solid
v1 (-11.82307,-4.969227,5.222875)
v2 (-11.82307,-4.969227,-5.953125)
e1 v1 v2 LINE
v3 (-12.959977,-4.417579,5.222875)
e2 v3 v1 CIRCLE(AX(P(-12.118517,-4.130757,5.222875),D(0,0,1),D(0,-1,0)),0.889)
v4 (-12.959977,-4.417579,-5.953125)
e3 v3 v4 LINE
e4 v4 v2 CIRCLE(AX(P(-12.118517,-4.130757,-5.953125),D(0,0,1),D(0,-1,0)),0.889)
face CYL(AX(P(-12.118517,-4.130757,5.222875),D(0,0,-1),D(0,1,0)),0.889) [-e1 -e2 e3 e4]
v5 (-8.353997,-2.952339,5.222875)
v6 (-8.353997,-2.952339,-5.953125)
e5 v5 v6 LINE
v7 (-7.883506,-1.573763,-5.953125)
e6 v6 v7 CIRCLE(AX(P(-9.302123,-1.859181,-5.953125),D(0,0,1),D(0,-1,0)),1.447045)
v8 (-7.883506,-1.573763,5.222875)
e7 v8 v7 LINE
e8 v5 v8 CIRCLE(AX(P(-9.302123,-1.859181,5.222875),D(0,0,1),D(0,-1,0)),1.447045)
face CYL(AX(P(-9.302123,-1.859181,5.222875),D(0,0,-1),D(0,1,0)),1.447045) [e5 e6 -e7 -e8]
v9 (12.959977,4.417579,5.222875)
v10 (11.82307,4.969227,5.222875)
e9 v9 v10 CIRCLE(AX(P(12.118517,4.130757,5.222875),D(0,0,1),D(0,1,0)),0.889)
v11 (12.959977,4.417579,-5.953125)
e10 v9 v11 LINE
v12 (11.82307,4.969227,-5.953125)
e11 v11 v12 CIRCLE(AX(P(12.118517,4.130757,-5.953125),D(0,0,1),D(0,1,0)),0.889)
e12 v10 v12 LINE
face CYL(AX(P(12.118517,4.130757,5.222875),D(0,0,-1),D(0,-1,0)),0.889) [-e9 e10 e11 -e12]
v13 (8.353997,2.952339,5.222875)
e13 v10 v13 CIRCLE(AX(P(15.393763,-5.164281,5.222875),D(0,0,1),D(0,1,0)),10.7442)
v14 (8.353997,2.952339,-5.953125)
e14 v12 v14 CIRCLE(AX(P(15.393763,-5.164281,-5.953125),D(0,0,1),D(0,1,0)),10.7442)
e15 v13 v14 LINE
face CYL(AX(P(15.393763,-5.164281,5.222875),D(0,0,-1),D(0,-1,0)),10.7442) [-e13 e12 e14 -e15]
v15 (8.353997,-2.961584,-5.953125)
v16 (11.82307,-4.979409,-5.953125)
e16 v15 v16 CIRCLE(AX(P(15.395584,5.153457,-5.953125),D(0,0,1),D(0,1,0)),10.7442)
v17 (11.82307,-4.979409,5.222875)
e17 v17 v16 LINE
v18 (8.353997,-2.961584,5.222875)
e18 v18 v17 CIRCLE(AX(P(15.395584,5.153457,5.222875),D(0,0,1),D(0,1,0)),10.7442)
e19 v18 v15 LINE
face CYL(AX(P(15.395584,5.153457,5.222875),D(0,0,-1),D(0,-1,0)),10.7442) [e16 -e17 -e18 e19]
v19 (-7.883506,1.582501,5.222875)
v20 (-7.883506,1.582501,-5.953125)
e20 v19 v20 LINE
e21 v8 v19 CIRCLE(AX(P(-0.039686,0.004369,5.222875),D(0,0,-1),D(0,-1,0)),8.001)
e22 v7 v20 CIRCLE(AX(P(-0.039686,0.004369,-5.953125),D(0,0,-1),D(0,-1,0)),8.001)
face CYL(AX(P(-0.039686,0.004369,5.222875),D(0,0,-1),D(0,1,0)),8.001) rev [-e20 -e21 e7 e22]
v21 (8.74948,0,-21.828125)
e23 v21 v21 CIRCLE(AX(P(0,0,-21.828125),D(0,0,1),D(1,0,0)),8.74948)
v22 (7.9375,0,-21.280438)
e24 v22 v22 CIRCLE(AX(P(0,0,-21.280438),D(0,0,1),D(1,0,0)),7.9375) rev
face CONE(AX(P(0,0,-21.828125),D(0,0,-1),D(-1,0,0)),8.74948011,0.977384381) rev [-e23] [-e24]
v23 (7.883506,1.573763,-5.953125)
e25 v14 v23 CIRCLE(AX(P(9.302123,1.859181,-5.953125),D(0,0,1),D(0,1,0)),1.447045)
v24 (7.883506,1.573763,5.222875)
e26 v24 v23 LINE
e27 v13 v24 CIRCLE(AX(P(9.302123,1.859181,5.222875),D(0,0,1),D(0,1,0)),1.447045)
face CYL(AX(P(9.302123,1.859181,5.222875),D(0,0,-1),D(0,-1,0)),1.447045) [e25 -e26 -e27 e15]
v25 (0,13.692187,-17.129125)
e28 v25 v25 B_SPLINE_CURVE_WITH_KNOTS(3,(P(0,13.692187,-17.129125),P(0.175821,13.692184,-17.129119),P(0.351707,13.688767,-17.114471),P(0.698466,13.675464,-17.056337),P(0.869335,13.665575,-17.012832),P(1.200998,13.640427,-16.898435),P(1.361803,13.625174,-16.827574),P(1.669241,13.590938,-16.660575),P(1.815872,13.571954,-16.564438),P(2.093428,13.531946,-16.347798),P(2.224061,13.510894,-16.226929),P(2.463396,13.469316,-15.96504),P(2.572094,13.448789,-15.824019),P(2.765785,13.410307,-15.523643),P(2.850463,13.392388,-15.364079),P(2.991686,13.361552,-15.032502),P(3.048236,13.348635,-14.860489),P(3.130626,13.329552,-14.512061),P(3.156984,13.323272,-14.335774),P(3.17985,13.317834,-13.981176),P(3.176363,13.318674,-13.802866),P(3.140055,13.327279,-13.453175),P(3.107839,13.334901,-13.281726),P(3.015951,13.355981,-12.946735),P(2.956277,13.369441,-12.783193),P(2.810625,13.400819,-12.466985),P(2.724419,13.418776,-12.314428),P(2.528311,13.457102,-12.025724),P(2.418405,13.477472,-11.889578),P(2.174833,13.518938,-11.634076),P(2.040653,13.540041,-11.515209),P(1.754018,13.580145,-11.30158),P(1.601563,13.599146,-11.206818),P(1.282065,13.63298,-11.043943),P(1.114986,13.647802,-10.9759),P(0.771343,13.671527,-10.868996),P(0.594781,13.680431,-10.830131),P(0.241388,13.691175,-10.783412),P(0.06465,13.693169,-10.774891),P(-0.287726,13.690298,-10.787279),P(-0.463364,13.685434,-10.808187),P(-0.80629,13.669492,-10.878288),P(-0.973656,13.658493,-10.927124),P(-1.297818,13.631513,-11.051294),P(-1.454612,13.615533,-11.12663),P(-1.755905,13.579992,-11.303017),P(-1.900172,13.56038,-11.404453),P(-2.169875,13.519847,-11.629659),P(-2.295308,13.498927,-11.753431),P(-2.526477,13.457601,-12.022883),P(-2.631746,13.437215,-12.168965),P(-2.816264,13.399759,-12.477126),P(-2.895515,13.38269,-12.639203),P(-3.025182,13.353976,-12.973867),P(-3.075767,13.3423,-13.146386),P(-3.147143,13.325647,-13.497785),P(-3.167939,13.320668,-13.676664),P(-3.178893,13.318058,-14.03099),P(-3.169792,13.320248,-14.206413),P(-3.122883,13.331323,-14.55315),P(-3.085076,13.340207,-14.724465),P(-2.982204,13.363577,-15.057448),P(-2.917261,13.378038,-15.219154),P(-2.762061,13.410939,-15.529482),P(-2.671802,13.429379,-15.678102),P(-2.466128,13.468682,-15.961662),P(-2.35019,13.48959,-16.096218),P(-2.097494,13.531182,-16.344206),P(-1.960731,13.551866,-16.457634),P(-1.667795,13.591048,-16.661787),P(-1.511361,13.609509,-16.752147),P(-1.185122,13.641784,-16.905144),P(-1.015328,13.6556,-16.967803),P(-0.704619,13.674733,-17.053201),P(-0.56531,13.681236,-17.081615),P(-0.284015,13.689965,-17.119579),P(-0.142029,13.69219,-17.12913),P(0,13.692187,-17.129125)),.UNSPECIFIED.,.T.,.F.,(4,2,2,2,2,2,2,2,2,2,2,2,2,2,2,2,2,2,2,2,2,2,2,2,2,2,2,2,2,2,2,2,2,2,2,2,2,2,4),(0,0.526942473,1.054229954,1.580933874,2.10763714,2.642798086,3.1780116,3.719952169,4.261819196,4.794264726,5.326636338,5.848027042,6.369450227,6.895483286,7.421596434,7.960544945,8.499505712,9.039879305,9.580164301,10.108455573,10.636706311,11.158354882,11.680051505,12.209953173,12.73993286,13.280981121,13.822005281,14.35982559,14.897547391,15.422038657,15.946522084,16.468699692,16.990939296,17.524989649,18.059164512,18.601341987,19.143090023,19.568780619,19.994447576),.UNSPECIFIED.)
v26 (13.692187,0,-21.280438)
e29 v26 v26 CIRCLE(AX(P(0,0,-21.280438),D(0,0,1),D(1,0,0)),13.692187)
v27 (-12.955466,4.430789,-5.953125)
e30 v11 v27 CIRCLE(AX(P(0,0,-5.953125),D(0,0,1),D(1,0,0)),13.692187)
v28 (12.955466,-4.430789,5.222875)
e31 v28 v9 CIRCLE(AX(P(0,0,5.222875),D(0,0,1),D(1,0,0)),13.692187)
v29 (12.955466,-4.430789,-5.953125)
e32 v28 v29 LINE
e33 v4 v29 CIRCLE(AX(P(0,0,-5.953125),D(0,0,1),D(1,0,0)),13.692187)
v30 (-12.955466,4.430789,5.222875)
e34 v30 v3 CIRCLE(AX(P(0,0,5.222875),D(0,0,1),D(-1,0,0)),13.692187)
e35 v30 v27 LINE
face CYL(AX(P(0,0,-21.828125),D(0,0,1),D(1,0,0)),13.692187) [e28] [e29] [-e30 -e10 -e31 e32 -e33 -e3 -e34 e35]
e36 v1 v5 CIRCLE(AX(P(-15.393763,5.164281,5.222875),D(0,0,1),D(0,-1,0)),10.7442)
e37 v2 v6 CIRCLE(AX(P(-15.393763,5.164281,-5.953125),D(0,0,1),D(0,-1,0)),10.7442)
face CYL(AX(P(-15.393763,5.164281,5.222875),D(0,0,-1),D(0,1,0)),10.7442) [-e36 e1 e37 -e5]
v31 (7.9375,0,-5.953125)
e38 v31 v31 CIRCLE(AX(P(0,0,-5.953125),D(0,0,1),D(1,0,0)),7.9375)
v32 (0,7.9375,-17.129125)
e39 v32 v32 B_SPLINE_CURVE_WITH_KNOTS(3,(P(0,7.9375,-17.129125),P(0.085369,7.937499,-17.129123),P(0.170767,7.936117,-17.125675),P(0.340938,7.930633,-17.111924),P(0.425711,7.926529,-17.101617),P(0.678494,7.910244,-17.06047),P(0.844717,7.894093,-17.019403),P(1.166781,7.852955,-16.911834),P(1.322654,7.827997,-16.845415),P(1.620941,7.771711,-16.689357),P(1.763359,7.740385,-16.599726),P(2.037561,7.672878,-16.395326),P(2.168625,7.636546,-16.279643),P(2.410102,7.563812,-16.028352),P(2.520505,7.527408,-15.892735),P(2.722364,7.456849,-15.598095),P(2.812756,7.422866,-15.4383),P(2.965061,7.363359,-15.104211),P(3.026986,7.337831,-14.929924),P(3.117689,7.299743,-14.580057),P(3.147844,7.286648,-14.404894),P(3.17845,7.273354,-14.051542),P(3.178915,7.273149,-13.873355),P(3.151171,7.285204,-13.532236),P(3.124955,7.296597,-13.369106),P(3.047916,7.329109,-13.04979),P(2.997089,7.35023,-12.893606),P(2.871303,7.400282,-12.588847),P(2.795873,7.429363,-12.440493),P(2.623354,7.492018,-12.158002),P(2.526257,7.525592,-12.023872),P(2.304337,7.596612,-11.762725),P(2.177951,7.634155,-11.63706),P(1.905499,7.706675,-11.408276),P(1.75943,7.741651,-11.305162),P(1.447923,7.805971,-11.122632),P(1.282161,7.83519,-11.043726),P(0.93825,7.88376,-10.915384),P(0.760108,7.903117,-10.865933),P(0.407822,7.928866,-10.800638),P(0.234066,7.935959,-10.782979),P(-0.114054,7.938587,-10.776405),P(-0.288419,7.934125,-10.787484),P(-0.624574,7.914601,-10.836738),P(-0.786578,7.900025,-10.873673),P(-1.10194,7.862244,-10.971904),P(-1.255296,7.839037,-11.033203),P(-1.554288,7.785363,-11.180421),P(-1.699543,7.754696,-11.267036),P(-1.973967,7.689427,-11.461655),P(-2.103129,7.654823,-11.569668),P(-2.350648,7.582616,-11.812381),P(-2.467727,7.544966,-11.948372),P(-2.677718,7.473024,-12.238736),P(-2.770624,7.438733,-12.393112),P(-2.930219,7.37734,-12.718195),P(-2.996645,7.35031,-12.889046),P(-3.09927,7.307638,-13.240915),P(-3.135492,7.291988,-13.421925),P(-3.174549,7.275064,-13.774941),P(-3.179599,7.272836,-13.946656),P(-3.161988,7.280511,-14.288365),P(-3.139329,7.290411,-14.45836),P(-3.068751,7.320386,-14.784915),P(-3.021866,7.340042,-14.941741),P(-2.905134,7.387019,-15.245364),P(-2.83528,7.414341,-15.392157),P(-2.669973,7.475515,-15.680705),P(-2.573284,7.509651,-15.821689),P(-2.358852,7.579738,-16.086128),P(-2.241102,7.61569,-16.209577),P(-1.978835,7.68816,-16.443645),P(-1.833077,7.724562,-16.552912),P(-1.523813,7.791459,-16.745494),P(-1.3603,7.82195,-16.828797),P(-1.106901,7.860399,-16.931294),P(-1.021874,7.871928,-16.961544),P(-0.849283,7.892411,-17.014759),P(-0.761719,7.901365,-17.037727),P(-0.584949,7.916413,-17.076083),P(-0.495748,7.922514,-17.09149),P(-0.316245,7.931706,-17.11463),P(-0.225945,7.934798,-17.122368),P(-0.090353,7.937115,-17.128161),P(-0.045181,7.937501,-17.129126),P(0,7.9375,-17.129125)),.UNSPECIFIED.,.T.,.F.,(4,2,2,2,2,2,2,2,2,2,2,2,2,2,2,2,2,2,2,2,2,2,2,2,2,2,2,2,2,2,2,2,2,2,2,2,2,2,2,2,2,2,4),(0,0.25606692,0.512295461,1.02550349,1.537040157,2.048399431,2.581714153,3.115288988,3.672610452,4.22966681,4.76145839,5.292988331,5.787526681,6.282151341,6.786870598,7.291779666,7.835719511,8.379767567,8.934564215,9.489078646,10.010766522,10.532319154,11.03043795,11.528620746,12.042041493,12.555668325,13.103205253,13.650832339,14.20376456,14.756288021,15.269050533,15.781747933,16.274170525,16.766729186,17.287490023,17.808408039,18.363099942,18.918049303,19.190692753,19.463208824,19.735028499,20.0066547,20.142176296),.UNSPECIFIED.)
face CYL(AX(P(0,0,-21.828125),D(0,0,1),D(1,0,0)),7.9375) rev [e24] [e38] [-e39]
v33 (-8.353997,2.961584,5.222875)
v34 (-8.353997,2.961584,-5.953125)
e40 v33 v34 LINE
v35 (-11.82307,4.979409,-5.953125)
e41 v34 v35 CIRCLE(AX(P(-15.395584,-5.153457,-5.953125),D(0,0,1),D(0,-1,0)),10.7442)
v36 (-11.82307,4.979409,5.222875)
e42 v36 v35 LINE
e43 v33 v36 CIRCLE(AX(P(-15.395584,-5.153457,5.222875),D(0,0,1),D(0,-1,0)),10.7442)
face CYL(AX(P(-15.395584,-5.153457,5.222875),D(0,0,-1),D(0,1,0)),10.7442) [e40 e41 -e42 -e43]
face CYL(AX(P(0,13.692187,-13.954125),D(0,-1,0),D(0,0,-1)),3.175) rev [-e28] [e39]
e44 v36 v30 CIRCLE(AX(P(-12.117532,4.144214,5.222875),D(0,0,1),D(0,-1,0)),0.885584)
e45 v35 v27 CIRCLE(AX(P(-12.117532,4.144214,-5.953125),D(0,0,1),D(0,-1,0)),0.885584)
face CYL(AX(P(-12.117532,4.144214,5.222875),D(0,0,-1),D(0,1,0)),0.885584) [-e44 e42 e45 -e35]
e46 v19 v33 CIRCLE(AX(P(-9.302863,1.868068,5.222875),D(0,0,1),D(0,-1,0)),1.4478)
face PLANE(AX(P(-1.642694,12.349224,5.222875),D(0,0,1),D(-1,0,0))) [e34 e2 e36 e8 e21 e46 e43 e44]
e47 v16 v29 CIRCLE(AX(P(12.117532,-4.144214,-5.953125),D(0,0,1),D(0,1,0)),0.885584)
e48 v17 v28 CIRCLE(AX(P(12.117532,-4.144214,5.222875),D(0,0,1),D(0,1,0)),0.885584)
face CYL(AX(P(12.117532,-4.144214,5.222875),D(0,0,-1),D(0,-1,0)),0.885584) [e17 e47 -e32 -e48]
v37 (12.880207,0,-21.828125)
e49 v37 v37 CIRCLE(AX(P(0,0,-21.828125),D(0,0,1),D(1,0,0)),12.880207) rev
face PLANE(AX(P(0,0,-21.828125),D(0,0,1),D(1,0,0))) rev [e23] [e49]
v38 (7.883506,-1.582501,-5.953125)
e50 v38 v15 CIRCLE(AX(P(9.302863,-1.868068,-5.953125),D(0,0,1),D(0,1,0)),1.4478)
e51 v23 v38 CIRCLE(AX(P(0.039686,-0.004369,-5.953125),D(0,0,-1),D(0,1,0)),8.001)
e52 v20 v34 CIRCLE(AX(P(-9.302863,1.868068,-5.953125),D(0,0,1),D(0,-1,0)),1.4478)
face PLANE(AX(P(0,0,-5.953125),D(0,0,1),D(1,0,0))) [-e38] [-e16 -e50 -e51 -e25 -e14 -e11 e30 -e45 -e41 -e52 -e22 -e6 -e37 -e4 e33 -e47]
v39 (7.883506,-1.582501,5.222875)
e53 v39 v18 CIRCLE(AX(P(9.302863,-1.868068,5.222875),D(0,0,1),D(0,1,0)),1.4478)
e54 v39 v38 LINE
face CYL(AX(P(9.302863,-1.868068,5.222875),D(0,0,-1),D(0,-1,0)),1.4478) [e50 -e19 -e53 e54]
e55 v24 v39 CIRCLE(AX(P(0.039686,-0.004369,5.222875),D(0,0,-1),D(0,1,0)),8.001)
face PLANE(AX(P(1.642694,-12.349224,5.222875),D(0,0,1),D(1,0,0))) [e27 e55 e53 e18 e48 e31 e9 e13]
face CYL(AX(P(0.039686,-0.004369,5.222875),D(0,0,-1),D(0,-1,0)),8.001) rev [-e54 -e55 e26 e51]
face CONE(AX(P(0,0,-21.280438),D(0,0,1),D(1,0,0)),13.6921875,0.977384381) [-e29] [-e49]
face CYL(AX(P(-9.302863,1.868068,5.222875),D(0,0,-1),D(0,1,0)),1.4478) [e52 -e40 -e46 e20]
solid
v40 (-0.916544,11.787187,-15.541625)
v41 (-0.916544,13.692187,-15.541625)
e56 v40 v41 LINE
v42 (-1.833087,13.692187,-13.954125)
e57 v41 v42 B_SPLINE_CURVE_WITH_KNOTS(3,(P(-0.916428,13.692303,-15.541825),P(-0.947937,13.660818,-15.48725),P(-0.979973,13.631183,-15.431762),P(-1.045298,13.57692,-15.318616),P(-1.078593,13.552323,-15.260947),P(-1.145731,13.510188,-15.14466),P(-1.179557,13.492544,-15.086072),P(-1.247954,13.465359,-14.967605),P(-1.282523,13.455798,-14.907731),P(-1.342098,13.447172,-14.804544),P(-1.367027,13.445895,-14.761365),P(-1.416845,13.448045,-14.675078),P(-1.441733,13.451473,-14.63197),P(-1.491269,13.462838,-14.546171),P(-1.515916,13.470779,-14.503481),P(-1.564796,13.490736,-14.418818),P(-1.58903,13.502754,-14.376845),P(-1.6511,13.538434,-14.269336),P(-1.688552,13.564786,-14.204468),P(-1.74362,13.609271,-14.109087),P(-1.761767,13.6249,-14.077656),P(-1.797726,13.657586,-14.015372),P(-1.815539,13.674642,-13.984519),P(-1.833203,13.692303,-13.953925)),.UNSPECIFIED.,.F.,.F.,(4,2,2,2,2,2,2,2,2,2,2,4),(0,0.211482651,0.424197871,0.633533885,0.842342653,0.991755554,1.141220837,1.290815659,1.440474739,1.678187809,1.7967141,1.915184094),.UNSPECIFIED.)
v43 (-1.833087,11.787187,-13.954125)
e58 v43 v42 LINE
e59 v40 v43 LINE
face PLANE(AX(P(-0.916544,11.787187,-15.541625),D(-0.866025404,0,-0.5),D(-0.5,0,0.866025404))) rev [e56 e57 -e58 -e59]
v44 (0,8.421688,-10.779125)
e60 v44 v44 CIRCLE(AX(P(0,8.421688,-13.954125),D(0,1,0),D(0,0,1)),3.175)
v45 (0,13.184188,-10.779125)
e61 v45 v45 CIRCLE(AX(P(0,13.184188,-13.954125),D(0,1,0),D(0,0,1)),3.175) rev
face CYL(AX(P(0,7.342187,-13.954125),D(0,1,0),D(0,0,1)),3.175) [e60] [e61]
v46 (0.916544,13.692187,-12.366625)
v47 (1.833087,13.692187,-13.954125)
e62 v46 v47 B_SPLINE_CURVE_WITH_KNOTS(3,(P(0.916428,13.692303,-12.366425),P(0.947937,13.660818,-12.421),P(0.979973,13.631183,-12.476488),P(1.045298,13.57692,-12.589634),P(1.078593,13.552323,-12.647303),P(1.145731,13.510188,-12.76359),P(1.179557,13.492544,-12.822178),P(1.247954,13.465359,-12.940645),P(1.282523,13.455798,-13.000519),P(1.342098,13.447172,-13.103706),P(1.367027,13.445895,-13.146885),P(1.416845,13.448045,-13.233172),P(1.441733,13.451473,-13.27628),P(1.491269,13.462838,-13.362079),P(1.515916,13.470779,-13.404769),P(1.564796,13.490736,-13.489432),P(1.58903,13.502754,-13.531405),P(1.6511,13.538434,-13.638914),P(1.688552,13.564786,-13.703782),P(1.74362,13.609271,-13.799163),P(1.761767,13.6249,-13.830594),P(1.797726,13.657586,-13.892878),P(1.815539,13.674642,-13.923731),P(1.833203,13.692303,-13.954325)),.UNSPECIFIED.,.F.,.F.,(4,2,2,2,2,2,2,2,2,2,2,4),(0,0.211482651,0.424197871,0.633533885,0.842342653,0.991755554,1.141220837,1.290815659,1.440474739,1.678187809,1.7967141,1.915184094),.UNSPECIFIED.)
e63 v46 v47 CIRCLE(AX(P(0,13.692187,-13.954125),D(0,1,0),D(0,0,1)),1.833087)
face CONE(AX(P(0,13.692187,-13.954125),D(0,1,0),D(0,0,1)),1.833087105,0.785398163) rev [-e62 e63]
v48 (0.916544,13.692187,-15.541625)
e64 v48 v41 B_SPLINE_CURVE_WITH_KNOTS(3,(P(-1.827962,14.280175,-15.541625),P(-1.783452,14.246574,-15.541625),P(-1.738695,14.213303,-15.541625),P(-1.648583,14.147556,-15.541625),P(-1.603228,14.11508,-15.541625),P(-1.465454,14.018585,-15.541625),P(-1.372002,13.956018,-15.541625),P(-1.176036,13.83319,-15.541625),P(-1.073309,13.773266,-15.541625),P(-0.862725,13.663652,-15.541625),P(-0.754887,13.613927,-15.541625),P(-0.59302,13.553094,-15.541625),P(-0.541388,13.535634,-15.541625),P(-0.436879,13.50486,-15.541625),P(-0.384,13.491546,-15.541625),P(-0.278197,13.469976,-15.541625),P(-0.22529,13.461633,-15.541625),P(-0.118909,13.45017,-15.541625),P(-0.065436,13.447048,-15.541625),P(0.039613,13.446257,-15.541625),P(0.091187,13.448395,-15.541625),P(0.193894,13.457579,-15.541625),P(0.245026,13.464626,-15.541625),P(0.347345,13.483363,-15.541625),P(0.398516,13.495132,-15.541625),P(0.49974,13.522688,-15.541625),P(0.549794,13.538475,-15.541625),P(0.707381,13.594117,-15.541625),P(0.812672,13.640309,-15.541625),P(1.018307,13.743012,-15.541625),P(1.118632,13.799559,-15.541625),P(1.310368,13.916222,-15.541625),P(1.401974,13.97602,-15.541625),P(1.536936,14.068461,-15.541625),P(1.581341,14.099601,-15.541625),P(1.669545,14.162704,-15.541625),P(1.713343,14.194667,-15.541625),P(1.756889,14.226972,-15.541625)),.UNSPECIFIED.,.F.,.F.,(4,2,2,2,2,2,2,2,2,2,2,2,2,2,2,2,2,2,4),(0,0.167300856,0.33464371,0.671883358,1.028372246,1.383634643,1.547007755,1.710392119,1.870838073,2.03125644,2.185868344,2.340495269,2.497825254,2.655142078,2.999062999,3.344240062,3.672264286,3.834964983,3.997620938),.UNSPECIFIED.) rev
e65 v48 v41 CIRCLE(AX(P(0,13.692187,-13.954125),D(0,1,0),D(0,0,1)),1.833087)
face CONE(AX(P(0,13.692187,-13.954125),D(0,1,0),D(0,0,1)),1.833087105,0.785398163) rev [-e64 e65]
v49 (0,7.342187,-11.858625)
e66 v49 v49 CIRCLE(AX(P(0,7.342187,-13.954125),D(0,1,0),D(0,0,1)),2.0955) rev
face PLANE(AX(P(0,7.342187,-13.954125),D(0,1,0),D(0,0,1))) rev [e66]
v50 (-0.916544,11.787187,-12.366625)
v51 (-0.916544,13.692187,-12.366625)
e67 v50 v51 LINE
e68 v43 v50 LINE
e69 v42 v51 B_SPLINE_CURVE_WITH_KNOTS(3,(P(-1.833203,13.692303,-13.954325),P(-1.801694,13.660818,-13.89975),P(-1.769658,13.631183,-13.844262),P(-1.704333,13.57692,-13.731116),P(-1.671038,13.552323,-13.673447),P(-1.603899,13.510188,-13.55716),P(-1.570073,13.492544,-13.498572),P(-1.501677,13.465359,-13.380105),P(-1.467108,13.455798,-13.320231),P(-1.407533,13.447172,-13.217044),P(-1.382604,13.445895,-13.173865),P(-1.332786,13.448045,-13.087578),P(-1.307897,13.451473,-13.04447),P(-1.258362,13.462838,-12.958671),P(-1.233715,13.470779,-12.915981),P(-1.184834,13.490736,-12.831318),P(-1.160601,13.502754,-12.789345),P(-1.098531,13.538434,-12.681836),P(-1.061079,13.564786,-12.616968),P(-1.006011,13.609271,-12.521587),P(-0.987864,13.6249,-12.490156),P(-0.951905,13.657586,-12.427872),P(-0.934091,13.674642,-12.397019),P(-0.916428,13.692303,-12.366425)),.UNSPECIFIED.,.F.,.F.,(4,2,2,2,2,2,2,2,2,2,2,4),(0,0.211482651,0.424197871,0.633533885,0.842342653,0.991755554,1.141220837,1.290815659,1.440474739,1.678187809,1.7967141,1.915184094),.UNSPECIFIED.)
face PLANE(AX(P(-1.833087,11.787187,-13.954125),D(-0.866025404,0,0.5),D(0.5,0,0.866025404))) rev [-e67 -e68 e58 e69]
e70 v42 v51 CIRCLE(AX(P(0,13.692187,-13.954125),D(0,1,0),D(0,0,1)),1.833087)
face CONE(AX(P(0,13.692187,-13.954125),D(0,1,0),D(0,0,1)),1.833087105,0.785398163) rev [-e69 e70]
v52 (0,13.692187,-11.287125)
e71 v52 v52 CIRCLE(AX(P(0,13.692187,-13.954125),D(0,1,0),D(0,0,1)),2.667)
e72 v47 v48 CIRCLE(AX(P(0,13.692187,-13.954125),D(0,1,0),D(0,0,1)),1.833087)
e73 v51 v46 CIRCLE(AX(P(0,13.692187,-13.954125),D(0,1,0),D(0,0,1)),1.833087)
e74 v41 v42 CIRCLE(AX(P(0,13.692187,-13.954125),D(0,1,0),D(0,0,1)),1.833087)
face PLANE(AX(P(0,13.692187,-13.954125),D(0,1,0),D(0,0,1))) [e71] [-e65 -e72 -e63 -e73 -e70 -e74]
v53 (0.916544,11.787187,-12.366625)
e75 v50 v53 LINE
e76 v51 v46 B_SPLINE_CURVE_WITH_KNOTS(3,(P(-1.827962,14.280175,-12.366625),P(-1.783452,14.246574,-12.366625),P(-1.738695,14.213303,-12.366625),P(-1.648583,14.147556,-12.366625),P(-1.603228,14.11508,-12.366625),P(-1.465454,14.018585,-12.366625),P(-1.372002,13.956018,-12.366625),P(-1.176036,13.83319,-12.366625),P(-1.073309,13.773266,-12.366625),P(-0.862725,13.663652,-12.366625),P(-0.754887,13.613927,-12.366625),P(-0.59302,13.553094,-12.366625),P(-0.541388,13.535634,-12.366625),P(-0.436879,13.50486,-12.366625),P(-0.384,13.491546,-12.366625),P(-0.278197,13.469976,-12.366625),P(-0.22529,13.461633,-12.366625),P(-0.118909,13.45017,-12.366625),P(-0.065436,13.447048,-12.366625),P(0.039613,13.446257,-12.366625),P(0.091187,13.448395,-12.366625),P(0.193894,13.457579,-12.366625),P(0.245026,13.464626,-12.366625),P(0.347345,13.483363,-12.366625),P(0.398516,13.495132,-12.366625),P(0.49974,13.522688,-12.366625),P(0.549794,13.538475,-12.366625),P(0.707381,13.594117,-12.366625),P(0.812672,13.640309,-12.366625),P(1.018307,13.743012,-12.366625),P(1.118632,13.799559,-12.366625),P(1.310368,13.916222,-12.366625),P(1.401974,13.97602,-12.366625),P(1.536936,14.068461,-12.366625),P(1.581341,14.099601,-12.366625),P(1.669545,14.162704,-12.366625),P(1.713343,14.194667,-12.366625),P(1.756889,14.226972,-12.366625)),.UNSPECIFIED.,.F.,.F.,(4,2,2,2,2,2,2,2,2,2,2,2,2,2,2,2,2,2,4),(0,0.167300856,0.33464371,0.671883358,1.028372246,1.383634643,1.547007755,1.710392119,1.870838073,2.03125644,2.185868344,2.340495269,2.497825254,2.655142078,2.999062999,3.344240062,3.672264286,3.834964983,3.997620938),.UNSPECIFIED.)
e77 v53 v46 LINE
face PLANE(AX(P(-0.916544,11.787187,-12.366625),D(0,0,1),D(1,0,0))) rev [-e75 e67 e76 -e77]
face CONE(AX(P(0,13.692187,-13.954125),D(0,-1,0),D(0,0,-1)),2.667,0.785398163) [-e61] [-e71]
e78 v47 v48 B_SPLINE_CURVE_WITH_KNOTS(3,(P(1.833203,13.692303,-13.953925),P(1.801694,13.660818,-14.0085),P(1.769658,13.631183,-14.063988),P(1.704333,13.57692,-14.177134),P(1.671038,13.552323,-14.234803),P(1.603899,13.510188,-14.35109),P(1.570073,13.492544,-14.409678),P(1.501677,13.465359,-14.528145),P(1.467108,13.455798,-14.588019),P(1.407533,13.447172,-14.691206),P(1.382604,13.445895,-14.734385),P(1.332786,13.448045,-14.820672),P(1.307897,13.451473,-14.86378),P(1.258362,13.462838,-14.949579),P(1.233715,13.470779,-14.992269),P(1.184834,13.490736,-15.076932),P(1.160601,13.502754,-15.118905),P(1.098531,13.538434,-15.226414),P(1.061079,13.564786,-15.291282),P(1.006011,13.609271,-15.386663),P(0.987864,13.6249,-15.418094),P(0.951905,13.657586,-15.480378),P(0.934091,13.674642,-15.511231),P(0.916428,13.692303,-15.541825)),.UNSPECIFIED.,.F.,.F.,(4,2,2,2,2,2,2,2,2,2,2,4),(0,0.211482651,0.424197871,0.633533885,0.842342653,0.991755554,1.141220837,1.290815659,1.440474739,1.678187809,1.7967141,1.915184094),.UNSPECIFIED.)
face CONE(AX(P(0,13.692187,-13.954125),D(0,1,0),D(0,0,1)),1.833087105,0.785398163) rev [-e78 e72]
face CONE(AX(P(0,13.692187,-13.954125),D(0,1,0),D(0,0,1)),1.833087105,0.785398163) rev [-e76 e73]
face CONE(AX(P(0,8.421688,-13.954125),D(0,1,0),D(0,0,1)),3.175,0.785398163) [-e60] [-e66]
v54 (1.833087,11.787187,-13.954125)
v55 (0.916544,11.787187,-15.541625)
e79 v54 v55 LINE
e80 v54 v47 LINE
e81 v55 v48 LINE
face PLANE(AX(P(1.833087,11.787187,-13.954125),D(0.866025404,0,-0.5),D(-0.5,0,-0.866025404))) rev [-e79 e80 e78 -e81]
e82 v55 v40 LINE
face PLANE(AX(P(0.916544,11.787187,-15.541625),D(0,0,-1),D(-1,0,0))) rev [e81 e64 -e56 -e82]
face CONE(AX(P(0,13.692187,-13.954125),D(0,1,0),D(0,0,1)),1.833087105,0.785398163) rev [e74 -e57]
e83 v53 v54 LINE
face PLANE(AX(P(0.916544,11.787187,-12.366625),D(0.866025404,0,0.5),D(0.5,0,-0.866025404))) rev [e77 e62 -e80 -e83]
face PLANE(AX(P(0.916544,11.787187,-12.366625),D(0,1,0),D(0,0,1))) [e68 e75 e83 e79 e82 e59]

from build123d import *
from OCP.BRepFilletAPI import BRepFilletAPI_MakeChamfer

# Parameters (mm, degrees)
BOSS_EXTRUDE1_START     = -5.953125
SKETCH1_R               = 13.6921875
BOSS_EXTRUDE1_DEPTH     = 15.875
BOSS_EXTRUDE5_START     = 11.176
BOSS_EXTRUDE5_DEPTH     = 11.176
MOVE_START              = -5.953125
MOVE_FACE1_DEPTH        = 11.176
MOVE_FACE1_2_DEPTH      = 11.176
CIRPATTERN3_START       = -5.953125
CIRPATTERN3_DEPTH       = 11.176
CUT_EXTRUDE5_DEPTH      = 30.179085628
CUT_EXTRUDE5_DEPTH_BACK = 30.179085628
SKETCH15_R              = 7.9375
CHAMFER1_SIZE           = 0.5476875
CHAMFER1_SIZE2          = 0.81198011
SKETCH5_R               = 3.175
CUT_EXTRUDE2_DEPTH      = 30.179085628
SKETCH6_R               = 3.175
BOSS_EXTRUDE3_DEPTH     = 6.35
CUT_EXTRUDE3_DEPTH      = 1.905
CHAMFER3_SIZE           = 0.508
CHAMFER4_SIZE           = 1.0795


# Read off the part's stored shape, not the designer's step: Move Face1, CirPattern3
with BuildPart() as part:
    # Sketch1 → Boss-Extrude1 (new body)
    with BuildSketch(Plane.XY.offset(BOSS_EXTRUDE1_START)):
        Circle(SKETCH1_R)
    extrude(amount=-BOSS_EXTRUDE1_DEPTH)

    # Sketch11 → Boss-Extrude5 (add)
    with BuildSketch(Plane.XY.offset(-5.953125).offset(BOSS_EXTRUDE5_START)):
        with BuildLine():
            ThreePointArc((-1.582501, -7.883505579), (-0.004369034, -8.040686324), (1.573762932, -7.883505579))
            ThreePointArc((1.573762932, -7.883505579), (2.326569083, -7.932638836), (2.952339417, -8.353996958))
            ThreePointArc((2.952339417, -8.353996958), (4.124174772, -9.993538922), (4.969226713, -11.823069782))
            ThreePointArc((4.969226713, -11.823069782), (4.930575443, -12.50660364), (4.417578974, -12.959976641))
            ThreePointArc((4.417578974, -12.959976641), (-0.006979455, -13.692185721), (-4.430789112, -12.955466274))
            ThreePointArc((-4.430789112, -12.955466274), (-4.941191352, -12.503649266), (-4.979409431, -11.823069782))
            ThreePointArc((-4.979409431, -11.823069782), (-4.13390788, -9.993483356), (-2.961583815, -8.353996958))
            ThreePointArc((-2.961583815, -8.353996958), (-2.335546152, -7.932611995), (-1.582501, -7.883505579))
        make_face()
    extrude(amount=-BOSS_EXTRUDE5_DEPTH)

    # Move Face1 outline → Move Face1 (cut)
    with BuildSketch(Plane.XY.offset(MOVE_START)):
        with BuildLine():
            ThreePointArc((-4.430789112, -12.955466274), (-0.006979455, -13.692185721), (4.417578974, -12.959976641))
            ThreePointArc((4.417578974, -12.959976641), (4.930575443, -12.50660364), (4.969226713, -11.823069782))
            ThreePointArc((4.969226713, -11.823069782), (4.124174772, -9.993538922), (2.952339417, -8.353996958))
            ThreePointArc((2.952339417, -8.353996958), (2.326569083, -7.932638836), (1.573762932, -7.883505579))
            ThreePointArc((1.573762932, -7.883505579), (-0.004369034, -8.040686324), (-1.582501, -7.883505579))
            ThreePointArc((-1.582501, -7.883505579), (-2.335546152, -7.932611995), (-2.961583815, -8.353996958))
            ThreePointArc((-2.961583815, -8.353996958), (-4.13390788, -9.993483356), (-4.979409431, -11.823069782))
            ThreePointArc((-4.979409431, -11.823069782), (-4.941191352, -12.503649266), (-4.430789112, -12.955466274))
        make_face()
    extrude(amount=MOVE_FACE1_DEPTH, mode=Mode.SUBTRACT)

    # Move Face1 2 outline → Move Face1 2 (add)
    with BuildSketch(Plane.XY.offset(MOVE_START)):
        with BuildLine():
            ThreePointArc((7.883505579, -1.582501), (7.932611995, -2.335546152), (8.353996958, -2.961583815))
            ThreePointArc((8.353996958, -2.961583815), (9.993483356, -4.13390788), (11.823069782, -4.979409431))
            ThreePointArc((11.823069782, -4.979409431), (12.503649266, -4.941191352), (12.955466274, -4.430789112))
            ThreePointArc((12.955466274, -4.430789112), (13.692185721, -0.006979455), (12.959976641, 4.417578974))
            ThreePointArc((12.959976641, 4.417578974), (12.50660364, 4.930575443), (11.823069782, 4.969226713))
            ThreePointArc((11.823069782, 4.969226713), (9.993538922, 4.124174772), (8.353996958, 2.952339417))
            ThreePointArc((8.353996958, 2.952339417), (7.932638836, 2.326569083), (7.883505579, 1.573762932))
            ThreePointArc((7.883505579, 1.573762932), (8.040686324, -0.004369034), (7.883505579, -1.582501))
        make_face()
    extrude(amount=MOVE_FACE1_2_DEPTH)

    # CirPattern3 outline → CirPattern3 (add)
    with BuildSketch(Plane.XY.offset(CIRPATTERN3_START)):
        with BuildLine():
            ThreePointArc((-7.883505579, 1.582501), (-7.932611995, 2.335546152), (-8.353996958, 2.961583815))
            ThreePointArc((-8.353996958, 2.961583815), (-9.993483356, 4.13390788), (-11.823069782, 4.979409431))
            ThreePointArc((-11.823069782, 4.979409431), (-12.503649266, 4.941191352), (-12.955466274, 4.430789112))
            ThreePointArc((-12.955466274, 4.430789112), (-13.692185721, 0.006979455), (-12.959976641, -4.417578974))
            ThreePointArc((-12.959976641, -4.417578974), (-12.50660364, -4.930575443), (-11.823069782, -4.969226713))
            ThreePointArc((-11.823069782, -4.969226713), (-9.993538922, -4.124174772), (-8.353996958, -2.952339417))
            ThreePointArc((-8.353996958, -2.952339417), (-7.932638836, -2.326569083), (-7.883505579, -1.573762932))
            ThreePointArc((-7.883505579, -1.573762932), (-8.040686324, 0.004369034), (-7.883505579, 1.582501))
        make_face()
    extrude(amount=CIRPATTERN3_DEPTH)

    # Sketch15 → Cut-Extrude5 (cut, two sides: drawn at the far end of the back side and taken through both)
    with BuildSketch(Plane.XY.offset(-CUT_EXTRUDE5_DEPTH_BACK)):
        Circle(SKETCH15_R)
    extrude(amount=CUT_EXTRUDE5_DEPTH + CUT_EXTRUDE5_DEPTH_BACK, mode=Mode.SUBTRACT)

    # Chamfer1: one chamfer whose edges measure the first distance from different faces: ONE call of the kernel's chamfer builder (chamfer() names one face for all edges)
    chamfer1_edges_1 = [part.edges().sort_by_distance(p)[0] for p in [
        (-13.6921875, 0, -21.828125),
    ]]
    chamfer1_side_1 = [part.faces().sort_by_distance(p)[0] for p in [
        (-13.6921875, 0, -13.890625),
    ]]
    chamfer1_edges_2 = [part.edges().sort_by_distance(p)[0] for p in [
        (-7.9375, 0, -21.828125),
    ]]
    chamfer1_side_2 = [part.faces().sort_by_distance(p)[0] for p in [
        (-7.9375, 0, -13.890625),
    ]]
    chamfer1 = BRepFilletAPI_MakeChamfer(part.part.solid().wrapped)
    for e in chamfer1_edges_1:
        chamfer1.Add(CHAMFER1_SIZE, CHAMFER1_SIZE2, e.wrapped, chamfer1_side_1[0].wrapped)  # the first distance lies on this face
    for e in chamfer1_edges_2:
        chamfer1.Add(CHAMFER1_SIZE, CHAMFER1_SIZE2, e.wrapped, chamfer1_side_2[0].wrapped)  # the first distance lies on this face
    add(Compound.cast(chamfer1.Shape()), mode=Mode.REPLACE)

    # Sketch5 → Cut-Extrude2 (cut, through all)
    with BuildSketch(Plane(origin=(0, 0, 0), x_dir=(1, 0, 0), z_dir=(0, 1, 0))):
        with Locations(Location((0, 13.954125, 0), (0, 0, 90))):
            Circle(SKETCH5_R)
    extrude(amount=CUT_EXTRUDE2_DEPTH, mode=Mode.SUBTRACT)


with BuildPart() as body_2:
    # Sketch6 → Boss-Extrude3 (new body)
    with BuildSketch(Plane(origin=(0, 13.6921875, 0), x_dir=(-1, 0, 0), z_dir=(0, 1, 0))):
        with Locations(Location((0, -13.954125, 0), (0, 0, 90))):
            Circle(SKETCH6_R)
    extrude(amount=-BOSS_EXTRUDE3_DEPTH)

    # Sketch8 → Cut-Extrude3 (cut)
    with BuildSketch(Plane(origin=(0, 13.6921875, 0), x_dir=(1, 0, 0), z_dir=(0, 1, 0))):
        Polygon((0.916543552, 12.366625), (1.833087105, 13.954125), (0.916543552, 15.541625), (-0.916543552, 15.541625), (-1.833087105, 13.954125), (-0.916543552, 12.366625), align=None)
    extrude(amount=-CUT_EXTRUDE3_DEPTH, mode=Mode.SUBTRACT)

    # Cut-Extrude4 cone 1 section (through the dimple's axis) → Cut-Extrude4 (revolve, cut)
    with BuildSketch(Plane(origin=(0, 13.6921875, -13.954125), x_dir=(0, 0, 1), z_dir=(1, 0, 0))):
        Polygon((0, 0), (1.833087105, 0), (0, 1.833087105), align=None)
    revolve(axis=Axis((0, 13.6921875, -13.954125), (0, -1, 0)), mode=Mode.SUBTRACT)

    # Chamfer3
    chamfer3_edges = [body_2.edges().sort_by_distance(p)[0] for p in [
        (0, 13.6921875, -17.129125),
    ]]
    chamfer(chamfer3_edges, length=CHAMFER3_SIZE)

    # Chamfer4
    chamfer4_edges = [body_2.edges().sort_by_distance(p)[0] for p in [
        (0, 7.3421875, -17.129125),
    ]]
    chamfer(chamfer4_edges, length=CHAMFER4_SIZE)


solid = Compound([part.part, body_2.part])
